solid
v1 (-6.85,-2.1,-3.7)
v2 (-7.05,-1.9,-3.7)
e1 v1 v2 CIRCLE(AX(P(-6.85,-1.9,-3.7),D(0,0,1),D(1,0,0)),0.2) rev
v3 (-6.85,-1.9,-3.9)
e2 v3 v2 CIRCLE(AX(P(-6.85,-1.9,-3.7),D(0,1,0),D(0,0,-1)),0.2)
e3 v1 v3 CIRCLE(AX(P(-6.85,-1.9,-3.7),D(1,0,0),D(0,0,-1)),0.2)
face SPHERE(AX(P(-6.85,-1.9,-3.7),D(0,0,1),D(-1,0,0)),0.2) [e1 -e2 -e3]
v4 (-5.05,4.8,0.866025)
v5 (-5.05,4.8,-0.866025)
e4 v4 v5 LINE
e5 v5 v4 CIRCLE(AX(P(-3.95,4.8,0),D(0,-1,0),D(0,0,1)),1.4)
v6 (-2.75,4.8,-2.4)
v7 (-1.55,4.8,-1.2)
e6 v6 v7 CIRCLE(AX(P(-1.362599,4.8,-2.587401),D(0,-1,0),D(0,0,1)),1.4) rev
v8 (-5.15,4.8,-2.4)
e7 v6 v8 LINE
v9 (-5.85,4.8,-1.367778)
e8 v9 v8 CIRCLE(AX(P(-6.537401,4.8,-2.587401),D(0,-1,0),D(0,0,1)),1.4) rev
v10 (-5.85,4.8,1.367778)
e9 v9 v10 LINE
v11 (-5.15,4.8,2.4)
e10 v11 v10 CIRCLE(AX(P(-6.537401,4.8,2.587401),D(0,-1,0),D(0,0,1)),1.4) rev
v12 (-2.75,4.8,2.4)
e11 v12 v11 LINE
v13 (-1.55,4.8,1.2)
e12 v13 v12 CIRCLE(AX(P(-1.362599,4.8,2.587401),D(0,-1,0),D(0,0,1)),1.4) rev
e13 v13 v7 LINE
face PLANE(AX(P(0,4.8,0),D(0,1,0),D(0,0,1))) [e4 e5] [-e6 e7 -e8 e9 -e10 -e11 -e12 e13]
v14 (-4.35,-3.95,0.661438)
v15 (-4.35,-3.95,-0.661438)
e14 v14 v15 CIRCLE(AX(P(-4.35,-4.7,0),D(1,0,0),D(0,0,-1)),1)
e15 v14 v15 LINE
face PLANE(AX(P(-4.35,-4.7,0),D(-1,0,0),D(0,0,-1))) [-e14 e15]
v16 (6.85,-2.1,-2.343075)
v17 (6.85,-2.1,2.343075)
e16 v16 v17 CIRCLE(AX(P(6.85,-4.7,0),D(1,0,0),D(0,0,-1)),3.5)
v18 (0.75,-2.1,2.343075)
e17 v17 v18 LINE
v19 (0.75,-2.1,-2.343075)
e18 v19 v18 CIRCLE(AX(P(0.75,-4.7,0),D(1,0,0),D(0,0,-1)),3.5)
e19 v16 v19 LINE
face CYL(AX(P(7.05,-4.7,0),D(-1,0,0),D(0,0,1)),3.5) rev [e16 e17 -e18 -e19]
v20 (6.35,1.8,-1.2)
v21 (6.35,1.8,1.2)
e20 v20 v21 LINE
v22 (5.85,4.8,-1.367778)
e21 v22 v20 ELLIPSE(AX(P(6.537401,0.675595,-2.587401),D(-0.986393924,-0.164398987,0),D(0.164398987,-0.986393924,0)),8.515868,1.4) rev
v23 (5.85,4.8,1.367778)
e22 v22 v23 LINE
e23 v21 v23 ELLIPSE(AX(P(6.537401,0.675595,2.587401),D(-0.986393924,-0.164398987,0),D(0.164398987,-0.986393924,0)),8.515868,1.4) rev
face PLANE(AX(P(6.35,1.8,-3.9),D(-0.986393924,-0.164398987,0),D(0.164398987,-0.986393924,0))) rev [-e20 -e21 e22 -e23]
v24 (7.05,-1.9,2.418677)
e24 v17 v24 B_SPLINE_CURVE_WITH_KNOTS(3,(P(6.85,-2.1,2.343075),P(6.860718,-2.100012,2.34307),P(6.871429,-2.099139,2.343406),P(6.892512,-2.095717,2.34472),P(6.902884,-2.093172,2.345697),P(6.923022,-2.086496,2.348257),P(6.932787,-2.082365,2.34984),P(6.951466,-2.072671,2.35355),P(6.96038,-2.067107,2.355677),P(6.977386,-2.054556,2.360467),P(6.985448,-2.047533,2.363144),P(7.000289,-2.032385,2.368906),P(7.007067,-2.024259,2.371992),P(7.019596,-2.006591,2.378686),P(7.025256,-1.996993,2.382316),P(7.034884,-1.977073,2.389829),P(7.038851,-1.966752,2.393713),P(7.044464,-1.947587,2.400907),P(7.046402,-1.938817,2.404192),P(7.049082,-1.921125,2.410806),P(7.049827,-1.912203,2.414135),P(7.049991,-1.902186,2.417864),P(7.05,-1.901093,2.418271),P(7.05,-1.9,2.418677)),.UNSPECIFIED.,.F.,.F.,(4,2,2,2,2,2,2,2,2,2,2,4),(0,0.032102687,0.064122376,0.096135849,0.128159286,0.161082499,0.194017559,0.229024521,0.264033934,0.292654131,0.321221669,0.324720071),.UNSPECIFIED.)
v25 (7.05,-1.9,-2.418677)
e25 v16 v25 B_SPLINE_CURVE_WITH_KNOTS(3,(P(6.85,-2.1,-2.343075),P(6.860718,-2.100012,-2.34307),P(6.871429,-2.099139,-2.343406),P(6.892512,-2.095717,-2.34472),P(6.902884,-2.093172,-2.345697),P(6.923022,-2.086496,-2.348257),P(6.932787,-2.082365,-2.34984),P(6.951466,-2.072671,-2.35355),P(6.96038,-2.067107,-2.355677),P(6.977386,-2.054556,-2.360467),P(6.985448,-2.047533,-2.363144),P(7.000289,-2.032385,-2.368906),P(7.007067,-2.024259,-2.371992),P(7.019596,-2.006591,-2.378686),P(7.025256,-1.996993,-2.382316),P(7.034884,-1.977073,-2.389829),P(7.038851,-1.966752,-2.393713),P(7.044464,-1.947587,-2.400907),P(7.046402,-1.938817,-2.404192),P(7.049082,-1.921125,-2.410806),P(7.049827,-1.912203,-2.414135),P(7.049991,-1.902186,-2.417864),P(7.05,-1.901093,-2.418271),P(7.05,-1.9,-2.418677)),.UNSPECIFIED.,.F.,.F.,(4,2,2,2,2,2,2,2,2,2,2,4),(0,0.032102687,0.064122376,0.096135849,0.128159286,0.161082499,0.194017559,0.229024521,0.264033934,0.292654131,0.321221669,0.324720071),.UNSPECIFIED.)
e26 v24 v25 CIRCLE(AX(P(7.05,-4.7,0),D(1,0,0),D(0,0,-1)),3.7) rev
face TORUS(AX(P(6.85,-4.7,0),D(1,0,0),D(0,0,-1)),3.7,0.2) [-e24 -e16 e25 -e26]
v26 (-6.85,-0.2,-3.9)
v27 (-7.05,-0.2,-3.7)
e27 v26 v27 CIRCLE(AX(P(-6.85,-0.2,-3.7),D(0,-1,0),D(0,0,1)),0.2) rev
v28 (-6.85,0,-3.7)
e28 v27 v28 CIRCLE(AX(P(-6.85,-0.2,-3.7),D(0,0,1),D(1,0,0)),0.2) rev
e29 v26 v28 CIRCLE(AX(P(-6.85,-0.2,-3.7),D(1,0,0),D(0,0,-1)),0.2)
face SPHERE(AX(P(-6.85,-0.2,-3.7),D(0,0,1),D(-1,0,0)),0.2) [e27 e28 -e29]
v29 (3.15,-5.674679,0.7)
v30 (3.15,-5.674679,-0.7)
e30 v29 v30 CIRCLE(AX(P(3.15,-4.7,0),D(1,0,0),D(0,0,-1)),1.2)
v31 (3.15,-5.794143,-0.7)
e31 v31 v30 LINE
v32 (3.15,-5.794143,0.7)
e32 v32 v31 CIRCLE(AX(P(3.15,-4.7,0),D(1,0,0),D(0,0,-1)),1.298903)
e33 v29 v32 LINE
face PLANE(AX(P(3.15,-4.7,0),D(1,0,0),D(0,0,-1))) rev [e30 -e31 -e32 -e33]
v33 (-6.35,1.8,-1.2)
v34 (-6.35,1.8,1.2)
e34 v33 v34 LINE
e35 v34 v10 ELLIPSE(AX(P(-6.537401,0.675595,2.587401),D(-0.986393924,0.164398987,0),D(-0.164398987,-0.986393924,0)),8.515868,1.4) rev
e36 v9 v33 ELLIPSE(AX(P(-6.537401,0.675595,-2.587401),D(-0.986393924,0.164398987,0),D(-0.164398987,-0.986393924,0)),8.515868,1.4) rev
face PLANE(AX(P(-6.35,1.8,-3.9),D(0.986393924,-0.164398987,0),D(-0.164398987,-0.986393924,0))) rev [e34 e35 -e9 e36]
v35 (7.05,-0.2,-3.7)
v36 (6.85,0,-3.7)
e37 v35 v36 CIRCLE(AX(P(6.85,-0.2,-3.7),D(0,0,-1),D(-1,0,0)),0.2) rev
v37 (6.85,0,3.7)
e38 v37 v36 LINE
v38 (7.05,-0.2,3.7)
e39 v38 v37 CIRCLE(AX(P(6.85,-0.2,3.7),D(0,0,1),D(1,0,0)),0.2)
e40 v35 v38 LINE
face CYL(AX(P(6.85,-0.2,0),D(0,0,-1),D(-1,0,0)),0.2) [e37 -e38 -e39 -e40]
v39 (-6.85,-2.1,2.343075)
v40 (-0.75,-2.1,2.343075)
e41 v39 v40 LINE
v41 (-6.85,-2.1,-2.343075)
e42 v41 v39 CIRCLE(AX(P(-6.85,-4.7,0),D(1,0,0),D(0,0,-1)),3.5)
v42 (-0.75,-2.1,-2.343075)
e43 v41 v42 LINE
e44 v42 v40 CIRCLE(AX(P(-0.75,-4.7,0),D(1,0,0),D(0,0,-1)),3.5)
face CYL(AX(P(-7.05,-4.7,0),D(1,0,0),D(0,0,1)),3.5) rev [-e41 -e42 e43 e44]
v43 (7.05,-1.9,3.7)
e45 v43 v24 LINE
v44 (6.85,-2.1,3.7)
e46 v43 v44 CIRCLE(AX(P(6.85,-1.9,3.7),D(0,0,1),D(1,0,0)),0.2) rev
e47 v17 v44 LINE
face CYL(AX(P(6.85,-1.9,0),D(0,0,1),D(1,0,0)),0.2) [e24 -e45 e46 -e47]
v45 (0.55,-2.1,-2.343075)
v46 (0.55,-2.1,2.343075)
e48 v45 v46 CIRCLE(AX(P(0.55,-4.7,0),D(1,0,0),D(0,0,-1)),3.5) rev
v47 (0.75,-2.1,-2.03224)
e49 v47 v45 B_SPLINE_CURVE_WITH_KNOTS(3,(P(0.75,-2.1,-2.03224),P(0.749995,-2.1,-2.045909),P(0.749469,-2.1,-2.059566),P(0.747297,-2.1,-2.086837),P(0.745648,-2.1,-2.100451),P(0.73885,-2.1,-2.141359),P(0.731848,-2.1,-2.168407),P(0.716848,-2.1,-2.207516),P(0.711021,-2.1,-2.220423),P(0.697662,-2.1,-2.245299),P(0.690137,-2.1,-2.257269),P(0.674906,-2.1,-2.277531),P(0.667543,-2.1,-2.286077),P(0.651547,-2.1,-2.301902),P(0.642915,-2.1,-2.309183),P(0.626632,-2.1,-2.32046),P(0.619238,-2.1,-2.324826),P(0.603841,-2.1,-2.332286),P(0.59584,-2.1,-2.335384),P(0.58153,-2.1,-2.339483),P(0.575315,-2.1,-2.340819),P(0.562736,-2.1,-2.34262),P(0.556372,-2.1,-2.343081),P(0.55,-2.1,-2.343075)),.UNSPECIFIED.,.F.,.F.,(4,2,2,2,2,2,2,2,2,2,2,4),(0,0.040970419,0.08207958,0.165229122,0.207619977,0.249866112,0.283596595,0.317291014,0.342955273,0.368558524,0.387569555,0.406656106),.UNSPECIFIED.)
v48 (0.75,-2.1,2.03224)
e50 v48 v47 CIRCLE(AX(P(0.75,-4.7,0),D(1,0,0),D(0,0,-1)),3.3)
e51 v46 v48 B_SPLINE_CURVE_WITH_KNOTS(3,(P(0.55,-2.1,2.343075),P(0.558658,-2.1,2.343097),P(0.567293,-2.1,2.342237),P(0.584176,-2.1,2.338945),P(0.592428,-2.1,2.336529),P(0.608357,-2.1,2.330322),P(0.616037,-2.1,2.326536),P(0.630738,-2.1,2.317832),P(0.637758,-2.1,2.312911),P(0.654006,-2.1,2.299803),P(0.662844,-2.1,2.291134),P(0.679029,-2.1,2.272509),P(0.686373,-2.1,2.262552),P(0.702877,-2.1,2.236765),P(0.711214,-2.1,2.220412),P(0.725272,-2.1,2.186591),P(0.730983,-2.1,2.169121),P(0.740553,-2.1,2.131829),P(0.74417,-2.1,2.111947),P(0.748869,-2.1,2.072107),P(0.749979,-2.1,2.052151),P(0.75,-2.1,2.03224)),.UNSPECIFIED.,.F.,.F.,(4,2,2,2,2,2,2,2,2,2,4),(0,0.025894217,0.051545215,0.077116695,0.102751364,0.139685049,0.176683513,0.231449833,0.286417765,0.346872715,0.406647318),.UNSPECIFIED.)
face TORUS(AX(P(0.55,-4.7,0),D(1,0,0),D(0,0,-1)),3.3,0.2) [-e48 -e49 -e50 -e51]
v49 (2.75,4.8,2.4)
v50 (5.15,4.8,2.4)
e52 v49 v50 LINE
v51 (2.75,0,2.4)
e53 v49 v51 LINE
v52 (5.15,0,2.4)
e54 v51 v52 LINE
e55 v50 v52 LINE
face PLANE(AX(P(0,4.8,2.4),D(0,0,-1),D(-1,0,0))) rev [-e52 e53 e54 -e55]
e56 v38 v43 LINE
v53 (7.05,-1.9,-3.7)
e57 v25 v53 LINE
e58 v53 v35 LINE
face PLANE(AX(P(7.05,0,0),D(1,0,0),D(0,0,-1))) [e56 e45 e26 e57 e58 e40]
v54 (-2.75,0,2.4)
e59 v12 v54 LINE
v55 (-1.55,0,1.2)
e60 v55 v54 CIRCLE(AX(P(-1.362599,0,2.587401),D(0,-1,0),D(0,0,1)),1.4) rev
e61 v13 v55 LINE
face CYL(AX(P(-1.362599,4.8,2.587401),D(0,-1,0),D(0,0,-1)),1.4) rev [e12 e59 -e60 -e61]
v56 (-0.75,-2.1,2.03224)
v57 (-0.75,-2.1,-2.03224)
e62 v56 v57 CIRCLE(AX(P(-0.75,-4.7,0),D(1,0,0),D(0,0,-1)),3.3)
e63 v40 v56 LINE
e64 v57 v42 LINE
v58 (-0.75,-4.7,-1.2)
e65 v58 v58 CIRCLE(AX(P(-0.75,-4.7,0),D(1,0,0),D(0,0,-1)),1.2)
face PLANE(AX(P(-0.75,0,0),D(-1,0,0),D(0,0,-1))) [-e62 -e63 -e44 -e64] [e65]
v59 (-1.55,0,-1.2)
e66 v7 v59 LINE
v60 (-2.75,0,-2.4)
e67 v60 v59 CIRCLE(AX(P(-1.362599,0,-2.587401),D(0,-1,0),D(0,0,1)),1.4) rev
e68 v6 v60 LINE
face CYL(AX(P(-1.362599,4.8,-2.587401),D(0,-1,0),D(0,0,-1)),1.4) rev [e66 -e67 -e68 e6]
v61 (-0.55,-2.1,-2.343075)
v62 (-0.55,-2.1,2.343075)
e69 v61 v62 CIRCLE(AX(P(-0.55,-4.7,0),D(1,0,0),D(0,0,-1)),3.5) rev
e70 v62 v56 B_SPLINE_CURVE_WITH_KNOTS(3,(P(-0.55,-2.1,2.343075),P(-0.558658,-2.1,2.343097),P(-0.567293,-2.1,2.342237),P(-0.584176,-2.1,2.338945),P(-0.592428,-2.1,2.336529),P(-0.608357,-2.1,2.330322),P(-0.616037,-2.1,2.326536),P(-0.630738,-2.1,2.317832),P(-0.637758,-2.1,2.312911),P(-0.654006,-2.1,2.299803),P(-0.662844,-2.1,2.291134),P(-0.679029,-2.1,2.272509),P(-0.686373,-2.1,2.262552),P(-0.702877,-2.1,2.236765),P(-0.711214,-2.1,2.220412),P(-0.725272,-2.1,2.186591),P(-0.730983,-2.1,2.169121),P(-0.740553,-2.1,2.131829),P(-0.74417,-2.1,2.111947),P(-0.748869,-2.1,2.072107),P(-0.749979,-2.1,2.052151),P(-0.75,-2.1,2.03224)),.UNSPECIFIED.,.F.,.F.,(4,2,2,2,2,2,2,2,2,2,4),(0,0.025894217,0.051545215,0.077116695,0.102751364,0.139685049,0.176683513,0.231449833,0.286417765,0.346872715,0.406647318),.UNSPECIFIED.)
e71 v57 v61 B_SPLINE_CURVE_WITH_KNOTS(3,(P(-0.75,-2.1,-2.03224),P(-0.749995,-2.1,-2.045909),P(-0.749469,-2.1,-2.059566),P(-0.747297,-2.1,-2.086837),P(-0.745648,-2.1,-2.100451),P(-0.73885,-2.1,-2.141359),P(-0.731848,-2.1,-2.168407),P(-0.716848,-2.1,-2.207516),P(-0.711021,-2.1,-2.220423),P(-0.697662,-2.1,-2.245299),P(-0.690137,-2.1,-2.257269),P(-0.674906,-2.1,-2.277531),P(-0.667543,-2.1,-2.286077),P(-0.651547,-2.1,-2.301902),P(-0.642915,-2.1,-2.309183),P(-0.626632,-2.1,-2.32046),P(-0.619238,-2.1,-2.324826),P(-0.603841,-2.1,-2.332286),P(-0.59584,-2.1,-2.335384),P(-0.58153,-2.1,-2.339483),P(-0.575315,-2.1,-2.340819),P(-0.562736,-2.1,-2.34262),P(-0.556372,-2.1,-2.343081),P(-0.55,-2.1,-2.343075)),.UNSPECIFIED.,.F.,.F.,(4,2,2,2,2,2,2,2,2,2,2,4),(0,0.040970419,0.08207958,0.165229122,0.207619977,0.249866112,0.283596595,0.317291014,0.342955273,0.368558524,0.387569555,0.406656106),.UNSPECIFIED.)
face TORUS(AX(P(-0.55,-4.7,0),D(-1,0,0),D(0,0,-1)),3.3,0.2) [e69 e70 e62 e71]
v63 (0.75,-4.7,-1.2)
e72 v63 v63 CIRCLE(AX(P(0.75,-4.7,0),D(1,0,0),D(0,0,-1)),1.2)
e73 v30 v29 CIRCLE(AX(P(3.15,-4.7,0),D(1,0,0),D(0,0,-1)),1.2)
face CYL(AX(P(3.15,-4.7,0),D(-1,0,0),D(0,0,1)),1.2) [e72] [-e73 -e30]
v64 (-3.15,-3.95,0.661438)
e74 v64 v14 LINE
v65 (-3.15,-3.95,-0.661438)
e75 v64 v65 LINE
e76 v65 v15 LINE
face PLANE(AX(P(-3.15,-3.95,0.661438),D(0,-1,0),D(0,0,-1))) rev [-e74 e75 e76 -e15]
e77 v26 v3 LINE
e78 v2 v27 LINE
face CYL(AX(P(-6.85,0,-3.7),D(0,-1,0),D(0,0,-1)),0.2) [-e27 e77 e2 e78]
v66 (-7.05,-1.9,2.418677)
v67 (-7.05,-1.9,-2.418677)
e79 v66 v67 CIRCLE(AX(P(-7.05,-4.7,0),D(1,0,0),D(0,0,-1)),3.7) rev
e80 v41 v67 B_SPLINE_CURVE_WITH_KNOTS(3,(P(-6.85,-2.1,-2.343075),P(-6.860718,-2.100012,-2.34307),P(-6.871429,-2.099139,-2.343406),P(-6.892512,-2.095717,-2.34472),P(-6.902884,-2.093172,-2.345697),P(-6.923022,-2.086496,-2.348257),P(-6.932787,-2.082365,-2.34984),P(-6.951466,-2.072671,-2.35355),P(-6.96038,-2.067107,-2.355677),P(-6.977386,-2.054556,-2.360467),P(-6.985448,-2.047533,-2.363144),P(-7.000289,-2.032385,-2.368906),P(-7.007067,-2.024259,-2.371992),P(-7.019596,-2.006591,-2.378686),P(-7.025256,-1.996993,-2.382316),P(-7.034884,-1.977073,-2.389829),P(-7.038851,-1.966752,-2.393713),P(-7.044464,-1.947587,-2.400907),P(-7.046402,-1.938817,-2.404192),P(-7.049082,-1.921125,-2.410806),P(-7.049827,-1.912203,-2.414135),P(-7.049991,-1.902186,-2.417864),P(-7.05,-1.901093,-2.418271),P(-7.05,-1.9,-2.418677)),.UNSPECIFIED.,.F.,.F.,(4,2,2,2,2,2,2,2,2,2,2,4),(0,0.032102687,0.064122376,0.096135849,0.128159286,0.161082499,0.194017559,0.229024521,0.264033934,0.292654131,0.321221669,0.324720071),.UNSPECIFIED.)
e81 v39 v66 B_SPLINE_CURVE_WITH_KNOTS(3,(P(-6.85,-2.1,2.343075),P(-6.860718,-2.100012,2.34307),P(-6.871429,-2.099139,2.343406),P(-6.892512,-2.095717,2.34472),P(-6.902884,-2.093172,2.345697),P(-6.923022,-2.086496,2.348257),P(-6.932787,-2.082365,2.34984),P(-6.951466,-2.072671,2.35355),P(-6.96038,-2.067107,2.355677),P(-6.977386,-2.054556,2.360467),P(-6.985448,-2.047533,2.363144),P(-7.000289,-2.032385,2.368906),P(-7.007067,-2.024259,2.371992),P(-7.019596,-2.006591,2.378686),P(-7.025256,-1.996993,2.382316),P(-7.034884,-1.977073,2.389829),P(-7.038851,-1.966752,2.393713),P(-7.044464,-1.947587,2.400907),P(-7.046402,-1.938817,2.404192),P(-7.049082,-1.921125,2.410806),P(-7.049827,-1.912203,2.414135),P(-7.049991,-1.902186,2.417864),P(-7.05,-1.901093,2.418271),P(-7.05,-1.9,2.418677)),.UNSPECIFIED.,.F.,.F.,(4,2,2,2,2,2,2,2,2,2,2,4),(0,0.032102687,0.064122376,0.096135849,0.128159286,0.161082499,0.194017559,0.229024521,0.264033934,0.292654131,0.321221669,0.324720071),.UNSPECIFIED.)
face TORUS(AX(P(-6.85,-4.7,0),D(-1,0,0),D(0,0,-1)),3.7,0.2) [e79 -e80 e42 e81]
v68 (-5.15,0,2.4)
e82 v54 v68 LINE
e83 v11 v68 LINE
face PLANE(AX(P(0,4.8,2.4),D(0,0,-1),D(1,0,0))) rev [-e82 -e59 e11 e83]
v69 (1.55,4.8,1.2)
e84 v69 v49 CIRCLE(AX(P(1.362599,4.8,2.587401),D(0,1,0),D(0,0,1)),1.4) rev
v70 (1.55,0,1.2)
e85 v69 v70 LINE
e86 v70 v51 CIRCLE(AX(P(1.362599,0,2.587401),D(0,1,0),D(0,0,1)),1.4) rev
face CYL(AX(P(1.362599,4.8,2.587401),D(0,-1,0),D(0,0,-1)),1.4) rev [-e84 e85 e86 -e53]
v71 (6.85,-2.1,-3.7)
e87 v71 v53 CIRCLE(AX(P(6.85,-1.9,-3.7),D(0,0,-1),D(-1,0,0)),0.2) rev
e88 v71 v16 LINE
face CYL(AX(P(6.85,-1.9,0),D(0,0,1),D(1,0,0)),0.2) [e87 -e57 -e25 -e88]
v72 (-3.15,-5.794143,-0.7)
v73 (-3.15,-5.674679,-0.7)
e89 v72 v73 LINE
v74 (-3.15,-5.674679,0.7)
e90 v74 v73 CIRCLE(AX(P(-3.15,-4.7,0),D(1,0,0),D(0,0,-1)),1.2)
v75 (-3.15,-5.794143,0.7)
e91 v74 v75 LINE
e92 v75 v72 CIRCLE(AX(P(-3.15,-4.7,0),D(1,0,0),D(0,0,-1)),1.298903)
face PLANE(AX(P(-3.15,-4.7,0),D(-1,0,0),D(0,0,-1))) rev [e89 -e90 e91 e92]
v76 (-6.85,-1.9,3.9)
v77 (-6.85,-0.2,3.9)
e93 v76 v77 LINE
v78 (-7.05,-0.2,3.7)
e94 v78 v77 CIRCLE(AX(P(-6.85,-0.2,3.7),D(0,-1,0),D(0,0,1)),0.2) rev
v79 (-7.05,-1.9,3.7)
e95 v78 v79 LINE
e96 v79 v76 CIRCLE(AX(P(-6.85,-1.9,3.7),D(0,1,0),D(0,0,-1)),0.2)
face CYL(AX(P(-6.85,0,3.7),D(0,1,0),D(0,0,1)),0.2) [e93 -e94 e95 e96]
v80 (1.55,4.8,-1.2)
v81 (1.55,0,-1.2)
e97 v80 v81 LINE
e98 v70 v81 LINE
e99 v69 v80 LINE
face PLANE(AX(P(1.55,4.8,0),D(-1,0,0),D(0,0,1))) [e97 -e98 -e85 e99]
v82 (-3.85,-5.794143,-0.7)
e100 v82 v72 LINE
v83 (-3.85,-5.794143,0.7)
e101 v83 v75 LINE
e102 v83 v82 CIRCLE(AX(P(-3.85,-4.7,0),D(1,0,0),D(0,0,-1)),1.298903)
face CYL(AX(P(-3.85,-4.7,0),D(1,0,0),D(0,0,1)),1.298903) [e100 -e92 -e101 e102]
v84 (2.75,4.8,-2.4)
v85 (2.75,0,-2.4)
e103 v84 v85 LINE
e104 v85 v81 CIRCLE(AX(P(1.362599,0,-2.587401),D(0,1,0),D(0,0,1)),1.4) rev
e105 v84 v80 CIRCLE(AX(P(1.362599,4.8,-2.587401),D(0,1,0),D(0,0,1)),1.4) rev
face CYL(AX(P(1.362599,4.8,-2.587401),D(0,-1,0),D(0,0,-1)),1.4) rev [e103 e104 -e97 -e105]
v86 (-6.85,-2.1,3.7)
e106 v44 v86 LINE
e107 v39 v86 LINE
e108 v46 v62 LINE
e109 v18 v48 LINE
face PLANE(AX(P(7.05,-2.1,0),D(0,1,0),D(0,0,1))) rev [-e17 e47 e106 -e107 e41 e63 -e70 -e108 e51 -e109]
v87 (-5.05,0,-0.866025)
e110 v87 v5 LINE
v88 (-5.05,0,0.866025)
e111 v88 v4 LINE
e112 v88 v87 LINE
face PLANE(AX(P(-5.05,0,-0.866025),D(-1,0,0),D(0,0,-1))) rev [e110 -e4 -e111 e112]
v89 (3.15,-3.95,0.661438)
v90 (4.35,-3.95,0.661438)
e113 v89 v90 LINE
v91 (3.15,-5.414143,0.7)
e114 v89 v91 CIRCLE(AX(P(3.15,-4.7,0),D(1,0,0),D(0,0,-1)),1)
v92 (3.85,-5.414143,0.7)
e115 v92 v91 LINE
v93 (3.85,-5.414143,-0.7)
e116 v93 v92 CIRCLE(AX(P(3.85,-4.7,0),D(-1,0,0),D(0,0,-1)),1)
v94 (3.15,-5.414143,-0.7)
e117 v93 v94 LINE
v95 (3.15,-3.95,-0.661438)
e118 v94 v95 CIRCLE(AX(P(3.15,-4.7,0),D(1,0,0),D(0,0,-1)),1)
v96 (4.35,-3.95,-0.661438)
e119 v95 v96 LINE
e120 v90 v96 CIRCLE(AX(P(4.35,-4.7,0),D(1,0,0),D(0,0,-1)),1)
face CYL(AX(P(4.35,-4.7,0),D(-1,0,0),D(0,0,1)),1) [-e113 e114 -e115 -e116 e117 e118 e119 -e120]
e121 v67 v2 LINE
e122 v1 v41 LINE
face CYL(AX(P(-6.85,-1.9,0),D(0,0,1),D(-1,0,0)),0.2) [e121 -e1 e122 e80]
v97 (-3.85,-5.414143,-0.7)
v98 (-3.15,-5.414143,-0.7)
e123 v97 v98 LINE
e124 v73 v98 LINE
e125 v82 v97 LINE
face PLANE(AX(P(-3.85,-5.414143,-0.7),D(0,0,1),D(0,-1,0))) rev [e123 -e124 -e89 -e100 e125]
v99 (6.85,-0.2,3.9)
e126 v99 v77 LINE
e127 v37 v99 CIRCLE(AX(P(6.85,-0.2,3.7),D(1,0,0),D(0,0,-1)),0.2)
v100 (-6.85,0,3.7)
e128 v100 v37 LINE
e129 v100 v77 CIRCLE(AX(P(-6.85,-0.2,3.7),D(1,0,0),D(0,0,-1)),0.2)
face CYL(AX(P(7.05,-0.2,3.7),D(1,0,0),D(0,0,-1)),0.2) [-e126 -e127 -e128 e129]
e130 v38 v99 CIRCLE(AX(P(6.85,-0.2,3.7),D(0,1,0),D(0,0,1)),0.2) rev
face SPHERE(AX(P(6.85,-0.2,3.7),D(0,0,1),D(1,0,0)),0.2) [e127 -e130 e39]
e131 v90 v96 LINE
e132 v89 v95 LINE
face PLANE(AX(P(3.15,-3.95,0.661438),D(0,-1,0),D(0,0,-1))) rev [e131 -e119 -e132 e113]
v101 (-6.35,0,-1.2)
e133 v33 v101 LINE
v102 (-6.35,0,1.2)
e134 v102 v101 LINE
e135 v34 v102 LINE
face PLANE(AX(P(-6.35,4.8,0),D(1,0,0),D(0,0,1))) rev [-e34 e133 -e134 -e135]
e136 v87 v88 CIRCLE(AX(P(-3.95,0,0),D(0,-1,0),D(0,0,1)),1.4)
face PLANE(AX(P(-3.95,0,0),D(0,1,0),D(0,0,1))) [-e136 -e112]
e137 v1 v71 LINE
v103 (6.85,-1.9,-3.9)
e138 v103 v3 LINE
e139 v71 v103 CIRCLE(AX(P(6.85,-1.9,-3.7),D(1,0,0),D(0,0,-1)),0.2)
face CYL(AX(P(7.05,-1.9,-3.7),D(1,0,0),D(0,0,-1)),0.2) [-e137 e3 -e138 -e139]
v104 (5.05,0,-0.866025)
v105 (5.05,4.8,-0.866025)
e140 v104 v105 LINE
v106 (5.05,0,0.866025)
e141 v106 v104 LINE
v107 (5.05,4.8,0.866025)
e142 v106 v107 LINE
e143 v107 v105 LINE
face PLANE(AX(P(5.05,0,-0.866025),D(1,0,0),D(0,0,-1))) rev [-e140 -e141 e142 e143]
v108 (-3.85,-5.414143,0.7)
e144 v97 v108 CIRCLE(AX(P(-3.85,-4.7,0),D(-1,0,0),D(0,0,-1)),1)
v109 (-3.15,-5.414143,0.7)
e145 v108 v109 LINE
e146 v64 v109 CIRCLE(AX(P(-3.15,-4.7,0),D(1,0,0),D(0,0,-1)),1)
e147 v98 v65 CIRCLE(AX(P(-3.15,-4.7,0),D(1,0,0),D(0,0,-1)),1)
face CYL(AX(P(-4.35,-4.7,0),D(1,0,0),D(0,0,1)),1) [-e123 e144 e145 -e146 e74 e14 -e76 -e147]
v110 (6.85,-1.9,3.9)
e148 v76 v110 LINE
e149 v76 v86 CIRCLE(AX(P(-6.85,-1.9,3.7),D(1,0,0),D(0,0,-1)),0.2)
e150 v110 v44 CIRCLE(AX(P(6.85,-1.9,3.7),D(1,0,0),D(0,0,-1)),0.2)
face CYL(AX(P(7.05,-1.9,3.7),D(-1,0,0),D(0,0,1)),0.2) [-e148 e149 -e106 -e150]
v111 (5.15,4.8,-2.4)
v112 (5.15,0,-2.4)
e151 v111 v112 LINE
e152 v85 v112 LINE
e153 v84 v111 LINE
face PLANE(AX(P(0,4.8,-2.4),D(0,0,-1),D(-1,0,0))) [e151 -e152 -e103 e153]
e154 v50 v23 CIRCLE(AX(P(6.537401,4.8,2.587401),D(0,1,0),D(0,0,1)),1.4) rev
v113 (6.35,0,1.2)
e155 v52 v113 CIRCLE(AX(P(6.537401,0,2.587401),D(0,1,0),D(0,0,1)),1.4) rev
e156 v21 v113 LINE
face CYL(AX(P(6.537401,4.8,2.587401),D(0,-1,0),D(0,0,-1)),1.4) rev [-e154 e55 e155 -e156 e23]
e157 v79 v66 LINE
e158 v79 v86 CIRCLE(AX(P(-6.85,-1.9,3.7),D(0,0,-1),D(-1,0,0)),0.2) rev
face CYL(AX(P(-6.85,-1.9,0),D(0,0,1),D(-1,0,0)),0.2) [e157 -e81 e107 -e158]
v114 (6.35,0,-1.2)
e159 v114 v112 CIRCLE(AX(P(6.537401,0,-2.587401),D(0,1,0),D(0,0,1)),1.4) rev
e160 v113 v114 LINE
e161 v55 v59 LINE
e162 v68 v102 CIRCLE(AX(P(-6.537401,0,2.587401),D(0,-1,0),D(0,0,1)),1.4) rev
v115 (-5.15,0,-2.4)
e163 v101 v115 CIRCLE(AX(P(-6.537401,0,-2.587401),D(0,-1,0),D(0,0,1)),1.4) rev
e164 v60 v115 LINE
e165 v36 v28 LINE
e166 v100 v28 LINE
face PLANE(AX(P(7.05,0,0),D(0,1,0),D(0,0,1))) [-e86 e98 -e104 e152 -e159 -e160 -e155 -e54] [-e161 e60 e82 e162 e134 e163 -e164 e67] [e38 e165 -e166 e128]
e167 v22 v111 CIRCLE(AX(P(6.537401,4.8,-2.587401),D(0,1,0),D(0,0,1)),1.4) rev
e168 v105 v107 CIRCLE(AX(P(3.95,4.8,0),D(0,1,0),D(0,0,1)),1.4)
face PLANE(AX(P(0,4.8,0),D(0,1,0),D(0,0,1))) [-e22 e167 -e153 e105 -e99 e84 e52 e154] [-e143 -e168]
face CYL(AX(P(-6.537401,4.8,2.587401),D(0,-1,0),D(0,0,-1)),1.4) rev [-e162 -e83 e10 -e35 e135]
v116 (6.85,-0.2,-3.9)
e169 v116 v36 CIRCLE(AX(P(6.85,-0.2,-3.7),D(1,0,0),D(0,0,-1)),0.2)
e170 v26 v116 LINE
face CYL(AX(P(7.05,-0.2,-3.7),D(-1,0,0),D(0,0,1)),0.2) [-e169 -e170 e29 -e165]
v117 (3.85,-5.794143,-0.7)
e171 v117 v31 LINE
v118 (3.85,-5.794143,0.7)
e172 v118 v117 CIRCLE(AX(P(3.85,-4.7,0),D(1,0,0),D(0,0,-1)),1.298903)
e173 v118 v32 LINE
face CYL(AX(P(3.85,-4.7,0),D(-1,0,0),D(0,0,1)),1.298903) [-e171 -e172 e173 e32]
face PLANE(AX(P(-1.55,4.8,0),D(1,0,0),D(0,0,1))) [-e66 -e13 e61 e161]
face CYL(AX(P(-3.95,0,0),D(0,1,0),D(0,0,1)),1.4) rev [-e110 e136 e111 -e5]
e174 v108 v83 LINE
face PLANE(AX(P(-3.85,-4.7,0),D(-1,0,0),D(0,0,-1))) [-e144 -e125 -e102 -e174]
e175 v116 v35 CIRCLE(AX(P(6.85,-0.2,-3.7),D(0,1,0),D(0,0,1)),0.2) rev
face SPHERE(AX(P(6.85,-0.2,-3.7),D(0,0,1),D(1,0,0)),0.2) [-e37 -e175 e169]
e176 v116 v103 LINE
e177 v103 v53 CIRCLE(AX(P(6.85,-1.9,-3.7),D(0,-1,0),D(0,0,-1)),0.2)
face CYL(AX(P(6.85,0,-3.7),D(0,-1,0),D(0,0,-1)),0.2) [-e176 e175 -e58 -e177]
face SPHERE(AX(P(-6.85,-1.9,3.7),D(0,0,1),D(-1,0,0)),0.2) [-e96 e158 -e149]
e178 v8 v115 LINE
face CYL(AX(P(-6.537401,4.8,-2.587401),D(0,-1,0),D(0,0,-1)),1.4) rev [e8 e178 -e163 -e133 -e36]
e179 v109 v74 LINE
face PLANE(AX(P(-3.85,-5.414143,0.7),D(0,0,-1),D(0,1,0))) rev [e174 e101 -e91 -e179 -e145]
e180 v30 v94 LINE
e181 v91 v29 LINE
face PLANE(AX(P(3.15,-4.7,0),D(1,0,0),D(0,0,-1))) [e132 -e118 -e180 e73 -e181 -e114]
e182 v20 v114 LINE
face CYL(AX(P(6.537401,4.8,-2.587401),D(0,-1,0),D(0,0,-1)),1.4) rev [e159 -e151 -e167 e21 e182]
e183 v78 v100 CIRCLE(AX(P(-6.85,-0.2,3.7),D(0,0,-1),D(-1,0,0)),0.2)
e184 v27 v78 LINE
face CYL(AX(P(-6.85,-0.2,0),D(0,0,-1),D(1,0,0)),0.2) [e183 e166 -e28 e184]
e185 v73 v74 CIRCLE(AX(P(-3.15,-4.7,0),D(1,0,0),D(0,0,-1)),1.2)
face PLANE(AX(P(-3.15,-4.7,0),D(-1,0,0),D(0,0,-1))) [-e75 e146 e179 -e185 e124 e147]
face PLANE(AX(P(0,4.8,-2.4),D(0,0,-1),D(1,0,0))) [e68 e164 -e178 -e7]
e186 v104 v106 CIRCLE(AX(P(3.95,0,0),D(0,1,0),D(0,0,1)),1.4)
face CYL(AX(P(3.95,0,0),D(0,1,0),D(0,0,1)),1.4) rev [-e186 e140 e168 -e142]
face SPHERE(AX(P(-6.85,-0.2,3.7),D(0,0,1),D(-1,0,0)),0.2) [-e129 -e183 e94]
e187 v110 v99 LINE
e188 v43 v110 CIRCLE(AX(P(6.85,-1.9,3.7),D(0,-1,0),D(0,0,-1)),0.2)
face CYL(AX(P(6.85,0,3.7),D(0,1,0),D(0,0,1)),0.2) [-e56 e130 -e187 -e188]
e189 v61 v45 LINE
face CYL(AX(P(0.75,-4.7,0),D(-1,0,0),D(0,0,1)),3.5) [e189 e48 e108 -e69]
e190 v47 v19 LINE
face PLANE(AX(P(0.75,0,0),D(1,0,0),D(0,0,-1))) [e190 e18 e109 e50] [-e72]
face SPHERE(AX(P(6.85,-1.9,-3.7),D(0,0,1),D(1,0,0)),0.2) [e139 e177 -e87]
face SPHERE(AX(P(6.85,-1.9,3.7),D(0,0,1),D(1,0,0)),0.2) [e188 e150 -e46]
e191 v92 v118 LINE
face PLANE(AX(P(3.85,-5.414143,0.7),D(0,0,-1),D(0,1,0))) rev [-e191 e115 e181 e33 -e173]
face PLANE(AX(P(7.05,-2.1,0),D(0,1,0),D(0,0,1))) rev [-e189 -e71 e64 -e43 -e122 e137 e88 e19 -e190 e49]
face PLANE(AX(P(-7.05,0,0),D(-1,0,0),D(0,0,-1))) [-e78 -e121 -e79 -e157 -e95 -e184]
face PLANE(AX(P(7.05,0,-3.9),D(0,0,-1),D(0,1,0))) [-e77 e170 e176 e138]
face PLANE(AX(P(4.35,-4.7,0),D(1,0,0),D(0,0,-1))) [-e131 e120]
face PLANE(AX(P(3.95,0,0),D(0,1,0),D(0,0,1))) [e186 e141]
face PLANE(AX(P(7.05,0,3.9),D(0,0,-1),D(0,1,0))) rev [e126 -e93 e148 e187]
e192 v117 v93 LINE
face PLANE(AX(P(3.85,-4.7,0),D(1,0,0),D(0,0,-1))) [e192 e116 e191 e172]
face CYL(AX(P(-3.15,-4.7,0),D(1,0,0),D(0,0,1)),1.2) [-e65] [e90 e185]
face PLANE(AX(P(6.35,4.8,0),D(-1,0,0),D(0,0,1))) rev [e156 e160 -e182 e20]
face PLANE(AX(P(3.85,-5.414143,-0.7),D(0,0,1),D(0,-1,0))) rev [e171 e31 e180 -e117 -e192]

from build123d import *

# Parameters (mm, degrees)
BOSS_EXTRUDE1_DEPTH = 7.05
SKETCH1_5_R         = 3.5
BOSS_EXTRUDE2_DEPTH = 0.75
SKETCH2_R           = 1.2
BOSS_EXTRUDE3_DEPTH = 2.4
SKETCH3_R           = 1
BOSS_EXTRUDE4_DEPTH = 1.2
CUT_EXTRUDE1_START  = -1.2
CUT_EXTRUDE1_DEPTH  = 1.2
BOSS_EXTRUDE5_DEPTH = 0.7
BOSS_EXTRUDE6_DEPTH = 4.8
CUT_EXTRUDE2_DEPTH  = 4.8
CUT_EXTRUDE3_DEPTH  = 13.515290648
FILLET1_R           = 0.2


with BuildPart() as part:
    # Sketch1 → Boss-Extrude1 (new body)
    with BuildSketch(Plane(origin=(0, 0, 0), x_dir=(0, 0, -1), z_dir=(1, 0, 0))):
        with BuildLine():
            ThreePointArc((-2.343074903, -2.1), (0, -1.2), (2.343074903, -2.1))
            Line((2.343074903, -2.1), (3.9, -2.1))
            Line((3.9, -2.1), (3.9, 0))
            Line((3.9, 0), (-3.9, 0))
            Line((-3.9, 0), (-3.9, -2.1))
            Line((-3.9, -2.1), (-2.343074903, -2.1))
        make_face()
    extrude(amount=BOSS_EXTRUDE1_DEPTH)

    # Sketch1<5> → Boss-Extrude2 (add)
    with BuildSketch(Plane(origin=(0, 0, 0), x_dir=(0, 0, -1), z_dir=(1, 0, 0))):
        with Locations((0, -4.7)):
            Circle(SKETCH1_5_R)
    extrude(amount=BOSS_EXTRUDE2_DEPTH)

    # Sketch2 → Boss-Extrude3 (add)
    with BuildSketch(Plane(origin=(0.75, 0, 0), x_dir=(0, 0, -1), z_dir=(1, 0, 0))):
        with Locations((0, -4.7)):
            Circle(SKETCH2_R)
    extrude(amount=BOSS_EXTRUDE3_DEPTH)

    # Sketch3 → Boss-Extrude4 (add)
    with BuildSketch(Plane(origin=(3.15, 0, 0), x_dir=(0, 0, -1), z_dir=(1, 0, 0))):
        with Locations((0, -4.7)):
            Circle(SKETCH3_R)
    extrude(amount=BOSS_EXTRUDE4_DEPTH)

    # Sketch4 → Cut-Extrude1 (cut)
    with BuildSketch(Plane(origin=(4.35, 0, 0), x_dir=(0, 0, -1), z_dir=(1, 0, 0)).offset(CUT_EXTRUDE1_START)):
        with BuildLine():
            Line((-0.661437828, -3.95), (0.661437828, -3.95))
            ThreePointArc((0.661437828, -3.95), (0, -3.7), (-0.661437828, -3.95))
        make_face()
    extrude(amount=CUT_EXTRUDE1_DEPTH, mode=Mode.SUBTRACT)

    # Sketch5 → Boss-Extrude5 (add)
    with BuildSketch(Plane(origin=(3.15, 0, 0), x_dir=(0, 0, -1), z_dir=(1, 0, 0))):
        with BuildLine():
            Line((-0.7, -5.414142843), (-0.7, -5.794142843))
            ThreePointArc((-0.7, -5.794142843), (0, -5.99890283), (0.7, -5.794142843))
            Line((0.7, -5.794142843), (0.7, -5.414142843))
            ThreePointArc((0.7, -5.414142843), (0, -5.7), (-0.7, -5.414142843))
        make_face()
    extrude(amount=BOSS_EXTRUDE5_DEPTH)

    # Sketch6 → Boss-Extrude6 (add)
    with BuildSketch(Plane(origin=(0, 0, 0), x_dir=(1, 0, 0), z_dir=(0, 1, 0))):
        with BuildLine():
            ThreePointArc((1.55, -1.2), (2.352548706, -1.597451294), (2.75, -2.4))
            Line((2.75, -2.4), (5.15, -2.4))
            ThreePointArc((5.15, -2.4), (5.547451294, -1.597451294), (6.35, -1.2))
            Line((6.35, -1.2), (6.35, 1.2))
            ThreePointArc((6.35, 1.2), (5.547451294, 1.597451294), (5.15, 2.4))
            Line((5.15, 2.4), (2.75, 2.4))
            ThreePointArc((2.75, 2.4), (2.352548706, 1.597451294), (1.55, 1.2))
            Line((1.55, 1.2), (1.55, -1.2))
        make_face()
    extrude(amount=BOSS_EXTRUDE6_DEPTH)

    # Sketch7 → Cut-Extrude2 (cut)
    with BuildSketch(Plane(origin=(0, 4.8, 0), x_dir=(1, 0, 0), z_dir=(0, 1, 0))):
        with BuildLine():
            Line((5.05, 0.866025404), (5.05, -0.866025404))
            ThreePointArc((5.05, -0.866025404), (2.55, 0), (5.05, 0.866025404))
        make_face()
    extrude(amount=-CUT_EXTRUDE2_DEPTH, mode=Mode.SUBTRACT)

    # Sketch8 → Cut-Extrude3 (cut, through all)
    with BuildSketch(Plane.XY.offset(2.4)):
        Polygon((5.85, 4.8), (6.35, 4.8), (6.35, 1.8), align=None)
    extrude(amount=-CUT_EXTRUDE3_DEPTH, mode=Mode.SUBTRACT)

    # Fillet1
    # the kernel refuses this fillet: 0.2 mm, written as the material it takes off along each edge
    with BuildSketch(Plane(origin=(6.85, -1.9, 3.7), x_dir=(1, 0, 0), z_dir=(0, 0, 1))) as fillet1_piece_1_section:
        Polygon((0, 0), (FILLET1_R * 1.02, 0), (FILLET1_R * 1.02, -FILLET1_R * 1.02), (0, -FILLET1_R * 1.02), align=None)
    fillet1_piece_1 = extrude(amount=FILLET1_R * 1.02, mode=Mode.PRIVATE)
    fillet1_piece_1 = fillet1_piece_1 - Plane(origin=(6.85, -1.9, 3.7), x_dir=(-0.7071067811865475, 0.7071067811865475, 0), z_dir=(0, 0, 1)) * Sphere(FILLET1_R, mode=Mode.PRIVATE)
    add(fillet1_piece_1, mode=Mode.SUBTRACT)
    with BuildSketch(Plane(origin=(6.85, -0.2, 3.7), x_dir=(0, 0, 1), z_dir=(0, 1, 0))) as fillet1_piece_2_section:
        Polygon((0, 0), (FILLET1_R * 1.02, 0), (FILLET1_R * 1.02, FILLET1_R * 1.02), (0, FILLET1_R * 1.02), align=None)
    fillet1_piece_2 = extrude(amount=FILLET1_R * 1.02, mode=Mode.PRIVATE)
    fillet1_piece_2 = fillet1_piece_2 - Plane(origin=(6.85, -0.2, 3.7), x_dir=(-0.7071067811865475, 0, -0.7071067811865475), z_dir=(0, 1, 0)) * Sphere(FILLET1_R, mode=Mode.PRIVATE)
    add(fillet1_piece_2, mode=Mode.SUBTRACT)
    with BuildSketch(Plane(origin=(6.85, -0.2, -3.7), x_dir=(1, 0, 0), z_dir=(0, 1, 0))) as fillet1_piece_3_section:
        Polygon((0, 0), (FILLET1_R * 1.02, 0), (FILLET1_R * 1.02, FILLET1_R * 1.02), (0, FILLET1_R * 1.02), align=None)
    fillet1_piece_3 = extrude(amount=FILLET1_R * 1.02, mode=Mode.PRIVATE)
    fillet1_piece_3 = fillet1_piece_3 - Plane(origin=(6.85, -0.2, -3.7), x_dir=(-0.7071067811865475, 0, 0.7071067811865475), z_dir=(0, 1, 0)) * Sphere(FILLET1_R, mode=Mode.PRIVATE)
    add(fillet1_piece_3, mode=Mode.SUBTRACT)
    with BuildSketch(Plane(origin=(6.85, -1.9, -3.7), x_dir=(1, 0, 0), z_dir=(0, -1, 0))) as fillet1_piece_4_section:
        Polygon((0, 0), (FILLET1_R * 1.02, 0), (FILLET1_R * 1.02, -FILLET1_R * 1.02), (0, -FILLET1_R * 1.02), align=None)
    fillet1_piece_4 = extrude(amount=FILLET1_R * 1.02, mode=Mode.PRIVATE)
    fillet1_piece_4 = fillet1_piece_4 - Plane(origin=(6.85, -1.9, -3.7), x_dir=(-0.7071067811865475, 0, 0.7071067811865475), z_dir=(0, -1, 0)) * Sphere(FILLET1_R, mode=Mode.PRIVATE)
    add(fillet1_piece_4, mode=Mode.SUBTRACT)
    with BuildSketch(Plane(origin=(-0.5, -2.1, 3.9), x_dir=(0, 0, -1), z_dir=(1, 0, 0))) as fillet1_piece_5:
        with BuildLine():
            CenterArc((FILLET1_R, FILLET1_R), FILLET1_R, 180, 90)
            Line((0, FILLET1_R), (0, 0))
            Line((0, 0), (FILLET1_R, 0))
        make_face()
    extrude(amount=7.35, mode=Mode.SUBTRACT)
    with BuildSketch(Plane(origin=(-0.5, 0, 3.9), x_dir=(0, 0, -1), z_dir=(1, 0, 0)), Plane(origin=(-0.5, 0, -3.9), x_dir=(0, -1, 0), z_dir=(1, 0, 0)), Plane(origin=(-0.5, -2.1, -3.9), x_dir=(0, 0, 1), z_dir=(1, 0, 0))) as fillet1_piece_6:
        with BuildLine():
            CenterArc((FILLET1_R, -FILLET1_R), FILLET1_R, 90, 90)
            Line((0, -FILLET1_R), (0, 0))
            Line((0, 0), (FILLET1_R, 0))
        make_face()
    extrude(amount=7.35, mode=Mode.SUBTRACT)
    with BuildSketch(Plane(origin=(7.05, -1.9, -3.9), x_dir=(0, 0, 1), z_dir=(0, 1, 0)), Plane(origin=(7.05, -0.2, 3.9), x_dir=(0, 0, -1), z_dir=(0, -1, 0))) as fillet1_piece_7:
        with BuildLine():
            CenterArc((FILLET1_R, -FILLET1_R), FILLET1_R, 90, 90)
            Line((0, -FILLET1_R), (0, 0))
            Line((0, 0), (FILLET1_R, 0))
        make_face()
    extrude(amount=1.7, mode=Mode.SUBTRACT)
    with BuildSketch(Plane(origin=(7.05, 0, -3.7), x_dir=(0, -1, 0), z_dir=(0, 0, 1))) as fillet1_piece_8:
        with BuildLine():
            CenterArc((FILLET1_R, -FILLET1_R), FILLET1_R, 90, 90)
            Line((0, -FILLET1_R), (0, 0))
            Line((0, 0), (FILLET1_R, 0))
        make_face()
    extrude(amount=7.4, mode=Mode.SUBTRACT)
    with BuildSketch(Plane(origin=(0.75, -4.7, 0), x_dir=(0, 0.8309016210227964, 0.5564193528101707), z_dir=(0, 0.5564193528101707, -0.8309016210227964))) as fillet1_piece_9_section:
        with BuildLine():
            CenterArc((3.5 - FILLET1_R, -FILLET1_R), FILLET1_R, 0, 90)
            Line((3.5, -FILLET1_R), (3.5, 0))
            Line((3.5, 0), (3.5 - FILLET1_R, 0))
        make_face()
    fillet1_piece_9 = revolve(axis=Axis((0.75, -4.7, 0), (1, 0, 0)), revolution_arc=292.382935953, mode=Mode.PRIVATE)
    fillet1_piece_9 = split(fillet1_piece_9, bisect_by=Plane(origin=(0.695125207, -2.1, 0), z_dir=(0, -1, 0)), keep=Keep.TOP, mode=Mode.PRIVATE)
    add(fillet1_piece_9, mode=Mode.SUBTRACT)
    with BuildSketch(Plane(origin=(7.05, -2.1, 3.7), x_dir=(0, 1, 0), z_dir=(0, 0, -1))) as fillet1_piece_10:
        with BuildLine():
            CenterArc((FILLET1_R, -FILLET1_R), FILLET1_R, 90, 90)
            Line((0, -FILLET1_R), (0, 0))
            Line((0, 0), (FILLET1_R, 0))
        make_face()
    extrude(amount=1.856925097, mode=Mode.SUBTRACT)
    with BuildSketch(Plane(origin=(7.05, -4.7, 0), x_dir=(0, 0.6399406433840084, 0.7684243443210669), z_dir=(0, -0.7684243443210669, 0.6399406433840084))) as fillet1_piece_11:
        with BuildLine():
            CenterArc((3.5 + FILLET1_R, FILLET1_R), FILLET1_R, 180, 90)
            Line((3.5 + FILLET1_R, 0), (3.5, 0))
            Line((3.5, 0), (3.5, FILLET1_R))
        make_face()
    revolve(axis=Axis((7.05, -4.7, 0), (-1, 0, 0)), revolution_arc=100.425212863, mode=Mode.SUBTRACT)
    with BuildSketch(Plane(origin=(7.05, -2.1, -1.843074903), x_dir=(-1, 0, 0), z_dir=(0, 0, -1))) as fillet1_piece_12:
        with BuildLine():
            CenterArc((FILLET1_R, FILLET1_R), FILLET1_R, 180, 90)
            Line((0, FILLET1_R), (0, 0))
            Line((0, 0), (FILLET1_R, 0))
        make_face()
    extrude(amount=1.856925097, mode=Mode.SUBTRACT)

    # Mirror1: part across plane


with BuildPart() as part_1:
    add(part.part)
    add(part.part.mirror(Plane(origin=(0, 0, 0), x_dir=(0, 0, 1), z_dir=(1, 0, 0))))


solid = part_1.part
